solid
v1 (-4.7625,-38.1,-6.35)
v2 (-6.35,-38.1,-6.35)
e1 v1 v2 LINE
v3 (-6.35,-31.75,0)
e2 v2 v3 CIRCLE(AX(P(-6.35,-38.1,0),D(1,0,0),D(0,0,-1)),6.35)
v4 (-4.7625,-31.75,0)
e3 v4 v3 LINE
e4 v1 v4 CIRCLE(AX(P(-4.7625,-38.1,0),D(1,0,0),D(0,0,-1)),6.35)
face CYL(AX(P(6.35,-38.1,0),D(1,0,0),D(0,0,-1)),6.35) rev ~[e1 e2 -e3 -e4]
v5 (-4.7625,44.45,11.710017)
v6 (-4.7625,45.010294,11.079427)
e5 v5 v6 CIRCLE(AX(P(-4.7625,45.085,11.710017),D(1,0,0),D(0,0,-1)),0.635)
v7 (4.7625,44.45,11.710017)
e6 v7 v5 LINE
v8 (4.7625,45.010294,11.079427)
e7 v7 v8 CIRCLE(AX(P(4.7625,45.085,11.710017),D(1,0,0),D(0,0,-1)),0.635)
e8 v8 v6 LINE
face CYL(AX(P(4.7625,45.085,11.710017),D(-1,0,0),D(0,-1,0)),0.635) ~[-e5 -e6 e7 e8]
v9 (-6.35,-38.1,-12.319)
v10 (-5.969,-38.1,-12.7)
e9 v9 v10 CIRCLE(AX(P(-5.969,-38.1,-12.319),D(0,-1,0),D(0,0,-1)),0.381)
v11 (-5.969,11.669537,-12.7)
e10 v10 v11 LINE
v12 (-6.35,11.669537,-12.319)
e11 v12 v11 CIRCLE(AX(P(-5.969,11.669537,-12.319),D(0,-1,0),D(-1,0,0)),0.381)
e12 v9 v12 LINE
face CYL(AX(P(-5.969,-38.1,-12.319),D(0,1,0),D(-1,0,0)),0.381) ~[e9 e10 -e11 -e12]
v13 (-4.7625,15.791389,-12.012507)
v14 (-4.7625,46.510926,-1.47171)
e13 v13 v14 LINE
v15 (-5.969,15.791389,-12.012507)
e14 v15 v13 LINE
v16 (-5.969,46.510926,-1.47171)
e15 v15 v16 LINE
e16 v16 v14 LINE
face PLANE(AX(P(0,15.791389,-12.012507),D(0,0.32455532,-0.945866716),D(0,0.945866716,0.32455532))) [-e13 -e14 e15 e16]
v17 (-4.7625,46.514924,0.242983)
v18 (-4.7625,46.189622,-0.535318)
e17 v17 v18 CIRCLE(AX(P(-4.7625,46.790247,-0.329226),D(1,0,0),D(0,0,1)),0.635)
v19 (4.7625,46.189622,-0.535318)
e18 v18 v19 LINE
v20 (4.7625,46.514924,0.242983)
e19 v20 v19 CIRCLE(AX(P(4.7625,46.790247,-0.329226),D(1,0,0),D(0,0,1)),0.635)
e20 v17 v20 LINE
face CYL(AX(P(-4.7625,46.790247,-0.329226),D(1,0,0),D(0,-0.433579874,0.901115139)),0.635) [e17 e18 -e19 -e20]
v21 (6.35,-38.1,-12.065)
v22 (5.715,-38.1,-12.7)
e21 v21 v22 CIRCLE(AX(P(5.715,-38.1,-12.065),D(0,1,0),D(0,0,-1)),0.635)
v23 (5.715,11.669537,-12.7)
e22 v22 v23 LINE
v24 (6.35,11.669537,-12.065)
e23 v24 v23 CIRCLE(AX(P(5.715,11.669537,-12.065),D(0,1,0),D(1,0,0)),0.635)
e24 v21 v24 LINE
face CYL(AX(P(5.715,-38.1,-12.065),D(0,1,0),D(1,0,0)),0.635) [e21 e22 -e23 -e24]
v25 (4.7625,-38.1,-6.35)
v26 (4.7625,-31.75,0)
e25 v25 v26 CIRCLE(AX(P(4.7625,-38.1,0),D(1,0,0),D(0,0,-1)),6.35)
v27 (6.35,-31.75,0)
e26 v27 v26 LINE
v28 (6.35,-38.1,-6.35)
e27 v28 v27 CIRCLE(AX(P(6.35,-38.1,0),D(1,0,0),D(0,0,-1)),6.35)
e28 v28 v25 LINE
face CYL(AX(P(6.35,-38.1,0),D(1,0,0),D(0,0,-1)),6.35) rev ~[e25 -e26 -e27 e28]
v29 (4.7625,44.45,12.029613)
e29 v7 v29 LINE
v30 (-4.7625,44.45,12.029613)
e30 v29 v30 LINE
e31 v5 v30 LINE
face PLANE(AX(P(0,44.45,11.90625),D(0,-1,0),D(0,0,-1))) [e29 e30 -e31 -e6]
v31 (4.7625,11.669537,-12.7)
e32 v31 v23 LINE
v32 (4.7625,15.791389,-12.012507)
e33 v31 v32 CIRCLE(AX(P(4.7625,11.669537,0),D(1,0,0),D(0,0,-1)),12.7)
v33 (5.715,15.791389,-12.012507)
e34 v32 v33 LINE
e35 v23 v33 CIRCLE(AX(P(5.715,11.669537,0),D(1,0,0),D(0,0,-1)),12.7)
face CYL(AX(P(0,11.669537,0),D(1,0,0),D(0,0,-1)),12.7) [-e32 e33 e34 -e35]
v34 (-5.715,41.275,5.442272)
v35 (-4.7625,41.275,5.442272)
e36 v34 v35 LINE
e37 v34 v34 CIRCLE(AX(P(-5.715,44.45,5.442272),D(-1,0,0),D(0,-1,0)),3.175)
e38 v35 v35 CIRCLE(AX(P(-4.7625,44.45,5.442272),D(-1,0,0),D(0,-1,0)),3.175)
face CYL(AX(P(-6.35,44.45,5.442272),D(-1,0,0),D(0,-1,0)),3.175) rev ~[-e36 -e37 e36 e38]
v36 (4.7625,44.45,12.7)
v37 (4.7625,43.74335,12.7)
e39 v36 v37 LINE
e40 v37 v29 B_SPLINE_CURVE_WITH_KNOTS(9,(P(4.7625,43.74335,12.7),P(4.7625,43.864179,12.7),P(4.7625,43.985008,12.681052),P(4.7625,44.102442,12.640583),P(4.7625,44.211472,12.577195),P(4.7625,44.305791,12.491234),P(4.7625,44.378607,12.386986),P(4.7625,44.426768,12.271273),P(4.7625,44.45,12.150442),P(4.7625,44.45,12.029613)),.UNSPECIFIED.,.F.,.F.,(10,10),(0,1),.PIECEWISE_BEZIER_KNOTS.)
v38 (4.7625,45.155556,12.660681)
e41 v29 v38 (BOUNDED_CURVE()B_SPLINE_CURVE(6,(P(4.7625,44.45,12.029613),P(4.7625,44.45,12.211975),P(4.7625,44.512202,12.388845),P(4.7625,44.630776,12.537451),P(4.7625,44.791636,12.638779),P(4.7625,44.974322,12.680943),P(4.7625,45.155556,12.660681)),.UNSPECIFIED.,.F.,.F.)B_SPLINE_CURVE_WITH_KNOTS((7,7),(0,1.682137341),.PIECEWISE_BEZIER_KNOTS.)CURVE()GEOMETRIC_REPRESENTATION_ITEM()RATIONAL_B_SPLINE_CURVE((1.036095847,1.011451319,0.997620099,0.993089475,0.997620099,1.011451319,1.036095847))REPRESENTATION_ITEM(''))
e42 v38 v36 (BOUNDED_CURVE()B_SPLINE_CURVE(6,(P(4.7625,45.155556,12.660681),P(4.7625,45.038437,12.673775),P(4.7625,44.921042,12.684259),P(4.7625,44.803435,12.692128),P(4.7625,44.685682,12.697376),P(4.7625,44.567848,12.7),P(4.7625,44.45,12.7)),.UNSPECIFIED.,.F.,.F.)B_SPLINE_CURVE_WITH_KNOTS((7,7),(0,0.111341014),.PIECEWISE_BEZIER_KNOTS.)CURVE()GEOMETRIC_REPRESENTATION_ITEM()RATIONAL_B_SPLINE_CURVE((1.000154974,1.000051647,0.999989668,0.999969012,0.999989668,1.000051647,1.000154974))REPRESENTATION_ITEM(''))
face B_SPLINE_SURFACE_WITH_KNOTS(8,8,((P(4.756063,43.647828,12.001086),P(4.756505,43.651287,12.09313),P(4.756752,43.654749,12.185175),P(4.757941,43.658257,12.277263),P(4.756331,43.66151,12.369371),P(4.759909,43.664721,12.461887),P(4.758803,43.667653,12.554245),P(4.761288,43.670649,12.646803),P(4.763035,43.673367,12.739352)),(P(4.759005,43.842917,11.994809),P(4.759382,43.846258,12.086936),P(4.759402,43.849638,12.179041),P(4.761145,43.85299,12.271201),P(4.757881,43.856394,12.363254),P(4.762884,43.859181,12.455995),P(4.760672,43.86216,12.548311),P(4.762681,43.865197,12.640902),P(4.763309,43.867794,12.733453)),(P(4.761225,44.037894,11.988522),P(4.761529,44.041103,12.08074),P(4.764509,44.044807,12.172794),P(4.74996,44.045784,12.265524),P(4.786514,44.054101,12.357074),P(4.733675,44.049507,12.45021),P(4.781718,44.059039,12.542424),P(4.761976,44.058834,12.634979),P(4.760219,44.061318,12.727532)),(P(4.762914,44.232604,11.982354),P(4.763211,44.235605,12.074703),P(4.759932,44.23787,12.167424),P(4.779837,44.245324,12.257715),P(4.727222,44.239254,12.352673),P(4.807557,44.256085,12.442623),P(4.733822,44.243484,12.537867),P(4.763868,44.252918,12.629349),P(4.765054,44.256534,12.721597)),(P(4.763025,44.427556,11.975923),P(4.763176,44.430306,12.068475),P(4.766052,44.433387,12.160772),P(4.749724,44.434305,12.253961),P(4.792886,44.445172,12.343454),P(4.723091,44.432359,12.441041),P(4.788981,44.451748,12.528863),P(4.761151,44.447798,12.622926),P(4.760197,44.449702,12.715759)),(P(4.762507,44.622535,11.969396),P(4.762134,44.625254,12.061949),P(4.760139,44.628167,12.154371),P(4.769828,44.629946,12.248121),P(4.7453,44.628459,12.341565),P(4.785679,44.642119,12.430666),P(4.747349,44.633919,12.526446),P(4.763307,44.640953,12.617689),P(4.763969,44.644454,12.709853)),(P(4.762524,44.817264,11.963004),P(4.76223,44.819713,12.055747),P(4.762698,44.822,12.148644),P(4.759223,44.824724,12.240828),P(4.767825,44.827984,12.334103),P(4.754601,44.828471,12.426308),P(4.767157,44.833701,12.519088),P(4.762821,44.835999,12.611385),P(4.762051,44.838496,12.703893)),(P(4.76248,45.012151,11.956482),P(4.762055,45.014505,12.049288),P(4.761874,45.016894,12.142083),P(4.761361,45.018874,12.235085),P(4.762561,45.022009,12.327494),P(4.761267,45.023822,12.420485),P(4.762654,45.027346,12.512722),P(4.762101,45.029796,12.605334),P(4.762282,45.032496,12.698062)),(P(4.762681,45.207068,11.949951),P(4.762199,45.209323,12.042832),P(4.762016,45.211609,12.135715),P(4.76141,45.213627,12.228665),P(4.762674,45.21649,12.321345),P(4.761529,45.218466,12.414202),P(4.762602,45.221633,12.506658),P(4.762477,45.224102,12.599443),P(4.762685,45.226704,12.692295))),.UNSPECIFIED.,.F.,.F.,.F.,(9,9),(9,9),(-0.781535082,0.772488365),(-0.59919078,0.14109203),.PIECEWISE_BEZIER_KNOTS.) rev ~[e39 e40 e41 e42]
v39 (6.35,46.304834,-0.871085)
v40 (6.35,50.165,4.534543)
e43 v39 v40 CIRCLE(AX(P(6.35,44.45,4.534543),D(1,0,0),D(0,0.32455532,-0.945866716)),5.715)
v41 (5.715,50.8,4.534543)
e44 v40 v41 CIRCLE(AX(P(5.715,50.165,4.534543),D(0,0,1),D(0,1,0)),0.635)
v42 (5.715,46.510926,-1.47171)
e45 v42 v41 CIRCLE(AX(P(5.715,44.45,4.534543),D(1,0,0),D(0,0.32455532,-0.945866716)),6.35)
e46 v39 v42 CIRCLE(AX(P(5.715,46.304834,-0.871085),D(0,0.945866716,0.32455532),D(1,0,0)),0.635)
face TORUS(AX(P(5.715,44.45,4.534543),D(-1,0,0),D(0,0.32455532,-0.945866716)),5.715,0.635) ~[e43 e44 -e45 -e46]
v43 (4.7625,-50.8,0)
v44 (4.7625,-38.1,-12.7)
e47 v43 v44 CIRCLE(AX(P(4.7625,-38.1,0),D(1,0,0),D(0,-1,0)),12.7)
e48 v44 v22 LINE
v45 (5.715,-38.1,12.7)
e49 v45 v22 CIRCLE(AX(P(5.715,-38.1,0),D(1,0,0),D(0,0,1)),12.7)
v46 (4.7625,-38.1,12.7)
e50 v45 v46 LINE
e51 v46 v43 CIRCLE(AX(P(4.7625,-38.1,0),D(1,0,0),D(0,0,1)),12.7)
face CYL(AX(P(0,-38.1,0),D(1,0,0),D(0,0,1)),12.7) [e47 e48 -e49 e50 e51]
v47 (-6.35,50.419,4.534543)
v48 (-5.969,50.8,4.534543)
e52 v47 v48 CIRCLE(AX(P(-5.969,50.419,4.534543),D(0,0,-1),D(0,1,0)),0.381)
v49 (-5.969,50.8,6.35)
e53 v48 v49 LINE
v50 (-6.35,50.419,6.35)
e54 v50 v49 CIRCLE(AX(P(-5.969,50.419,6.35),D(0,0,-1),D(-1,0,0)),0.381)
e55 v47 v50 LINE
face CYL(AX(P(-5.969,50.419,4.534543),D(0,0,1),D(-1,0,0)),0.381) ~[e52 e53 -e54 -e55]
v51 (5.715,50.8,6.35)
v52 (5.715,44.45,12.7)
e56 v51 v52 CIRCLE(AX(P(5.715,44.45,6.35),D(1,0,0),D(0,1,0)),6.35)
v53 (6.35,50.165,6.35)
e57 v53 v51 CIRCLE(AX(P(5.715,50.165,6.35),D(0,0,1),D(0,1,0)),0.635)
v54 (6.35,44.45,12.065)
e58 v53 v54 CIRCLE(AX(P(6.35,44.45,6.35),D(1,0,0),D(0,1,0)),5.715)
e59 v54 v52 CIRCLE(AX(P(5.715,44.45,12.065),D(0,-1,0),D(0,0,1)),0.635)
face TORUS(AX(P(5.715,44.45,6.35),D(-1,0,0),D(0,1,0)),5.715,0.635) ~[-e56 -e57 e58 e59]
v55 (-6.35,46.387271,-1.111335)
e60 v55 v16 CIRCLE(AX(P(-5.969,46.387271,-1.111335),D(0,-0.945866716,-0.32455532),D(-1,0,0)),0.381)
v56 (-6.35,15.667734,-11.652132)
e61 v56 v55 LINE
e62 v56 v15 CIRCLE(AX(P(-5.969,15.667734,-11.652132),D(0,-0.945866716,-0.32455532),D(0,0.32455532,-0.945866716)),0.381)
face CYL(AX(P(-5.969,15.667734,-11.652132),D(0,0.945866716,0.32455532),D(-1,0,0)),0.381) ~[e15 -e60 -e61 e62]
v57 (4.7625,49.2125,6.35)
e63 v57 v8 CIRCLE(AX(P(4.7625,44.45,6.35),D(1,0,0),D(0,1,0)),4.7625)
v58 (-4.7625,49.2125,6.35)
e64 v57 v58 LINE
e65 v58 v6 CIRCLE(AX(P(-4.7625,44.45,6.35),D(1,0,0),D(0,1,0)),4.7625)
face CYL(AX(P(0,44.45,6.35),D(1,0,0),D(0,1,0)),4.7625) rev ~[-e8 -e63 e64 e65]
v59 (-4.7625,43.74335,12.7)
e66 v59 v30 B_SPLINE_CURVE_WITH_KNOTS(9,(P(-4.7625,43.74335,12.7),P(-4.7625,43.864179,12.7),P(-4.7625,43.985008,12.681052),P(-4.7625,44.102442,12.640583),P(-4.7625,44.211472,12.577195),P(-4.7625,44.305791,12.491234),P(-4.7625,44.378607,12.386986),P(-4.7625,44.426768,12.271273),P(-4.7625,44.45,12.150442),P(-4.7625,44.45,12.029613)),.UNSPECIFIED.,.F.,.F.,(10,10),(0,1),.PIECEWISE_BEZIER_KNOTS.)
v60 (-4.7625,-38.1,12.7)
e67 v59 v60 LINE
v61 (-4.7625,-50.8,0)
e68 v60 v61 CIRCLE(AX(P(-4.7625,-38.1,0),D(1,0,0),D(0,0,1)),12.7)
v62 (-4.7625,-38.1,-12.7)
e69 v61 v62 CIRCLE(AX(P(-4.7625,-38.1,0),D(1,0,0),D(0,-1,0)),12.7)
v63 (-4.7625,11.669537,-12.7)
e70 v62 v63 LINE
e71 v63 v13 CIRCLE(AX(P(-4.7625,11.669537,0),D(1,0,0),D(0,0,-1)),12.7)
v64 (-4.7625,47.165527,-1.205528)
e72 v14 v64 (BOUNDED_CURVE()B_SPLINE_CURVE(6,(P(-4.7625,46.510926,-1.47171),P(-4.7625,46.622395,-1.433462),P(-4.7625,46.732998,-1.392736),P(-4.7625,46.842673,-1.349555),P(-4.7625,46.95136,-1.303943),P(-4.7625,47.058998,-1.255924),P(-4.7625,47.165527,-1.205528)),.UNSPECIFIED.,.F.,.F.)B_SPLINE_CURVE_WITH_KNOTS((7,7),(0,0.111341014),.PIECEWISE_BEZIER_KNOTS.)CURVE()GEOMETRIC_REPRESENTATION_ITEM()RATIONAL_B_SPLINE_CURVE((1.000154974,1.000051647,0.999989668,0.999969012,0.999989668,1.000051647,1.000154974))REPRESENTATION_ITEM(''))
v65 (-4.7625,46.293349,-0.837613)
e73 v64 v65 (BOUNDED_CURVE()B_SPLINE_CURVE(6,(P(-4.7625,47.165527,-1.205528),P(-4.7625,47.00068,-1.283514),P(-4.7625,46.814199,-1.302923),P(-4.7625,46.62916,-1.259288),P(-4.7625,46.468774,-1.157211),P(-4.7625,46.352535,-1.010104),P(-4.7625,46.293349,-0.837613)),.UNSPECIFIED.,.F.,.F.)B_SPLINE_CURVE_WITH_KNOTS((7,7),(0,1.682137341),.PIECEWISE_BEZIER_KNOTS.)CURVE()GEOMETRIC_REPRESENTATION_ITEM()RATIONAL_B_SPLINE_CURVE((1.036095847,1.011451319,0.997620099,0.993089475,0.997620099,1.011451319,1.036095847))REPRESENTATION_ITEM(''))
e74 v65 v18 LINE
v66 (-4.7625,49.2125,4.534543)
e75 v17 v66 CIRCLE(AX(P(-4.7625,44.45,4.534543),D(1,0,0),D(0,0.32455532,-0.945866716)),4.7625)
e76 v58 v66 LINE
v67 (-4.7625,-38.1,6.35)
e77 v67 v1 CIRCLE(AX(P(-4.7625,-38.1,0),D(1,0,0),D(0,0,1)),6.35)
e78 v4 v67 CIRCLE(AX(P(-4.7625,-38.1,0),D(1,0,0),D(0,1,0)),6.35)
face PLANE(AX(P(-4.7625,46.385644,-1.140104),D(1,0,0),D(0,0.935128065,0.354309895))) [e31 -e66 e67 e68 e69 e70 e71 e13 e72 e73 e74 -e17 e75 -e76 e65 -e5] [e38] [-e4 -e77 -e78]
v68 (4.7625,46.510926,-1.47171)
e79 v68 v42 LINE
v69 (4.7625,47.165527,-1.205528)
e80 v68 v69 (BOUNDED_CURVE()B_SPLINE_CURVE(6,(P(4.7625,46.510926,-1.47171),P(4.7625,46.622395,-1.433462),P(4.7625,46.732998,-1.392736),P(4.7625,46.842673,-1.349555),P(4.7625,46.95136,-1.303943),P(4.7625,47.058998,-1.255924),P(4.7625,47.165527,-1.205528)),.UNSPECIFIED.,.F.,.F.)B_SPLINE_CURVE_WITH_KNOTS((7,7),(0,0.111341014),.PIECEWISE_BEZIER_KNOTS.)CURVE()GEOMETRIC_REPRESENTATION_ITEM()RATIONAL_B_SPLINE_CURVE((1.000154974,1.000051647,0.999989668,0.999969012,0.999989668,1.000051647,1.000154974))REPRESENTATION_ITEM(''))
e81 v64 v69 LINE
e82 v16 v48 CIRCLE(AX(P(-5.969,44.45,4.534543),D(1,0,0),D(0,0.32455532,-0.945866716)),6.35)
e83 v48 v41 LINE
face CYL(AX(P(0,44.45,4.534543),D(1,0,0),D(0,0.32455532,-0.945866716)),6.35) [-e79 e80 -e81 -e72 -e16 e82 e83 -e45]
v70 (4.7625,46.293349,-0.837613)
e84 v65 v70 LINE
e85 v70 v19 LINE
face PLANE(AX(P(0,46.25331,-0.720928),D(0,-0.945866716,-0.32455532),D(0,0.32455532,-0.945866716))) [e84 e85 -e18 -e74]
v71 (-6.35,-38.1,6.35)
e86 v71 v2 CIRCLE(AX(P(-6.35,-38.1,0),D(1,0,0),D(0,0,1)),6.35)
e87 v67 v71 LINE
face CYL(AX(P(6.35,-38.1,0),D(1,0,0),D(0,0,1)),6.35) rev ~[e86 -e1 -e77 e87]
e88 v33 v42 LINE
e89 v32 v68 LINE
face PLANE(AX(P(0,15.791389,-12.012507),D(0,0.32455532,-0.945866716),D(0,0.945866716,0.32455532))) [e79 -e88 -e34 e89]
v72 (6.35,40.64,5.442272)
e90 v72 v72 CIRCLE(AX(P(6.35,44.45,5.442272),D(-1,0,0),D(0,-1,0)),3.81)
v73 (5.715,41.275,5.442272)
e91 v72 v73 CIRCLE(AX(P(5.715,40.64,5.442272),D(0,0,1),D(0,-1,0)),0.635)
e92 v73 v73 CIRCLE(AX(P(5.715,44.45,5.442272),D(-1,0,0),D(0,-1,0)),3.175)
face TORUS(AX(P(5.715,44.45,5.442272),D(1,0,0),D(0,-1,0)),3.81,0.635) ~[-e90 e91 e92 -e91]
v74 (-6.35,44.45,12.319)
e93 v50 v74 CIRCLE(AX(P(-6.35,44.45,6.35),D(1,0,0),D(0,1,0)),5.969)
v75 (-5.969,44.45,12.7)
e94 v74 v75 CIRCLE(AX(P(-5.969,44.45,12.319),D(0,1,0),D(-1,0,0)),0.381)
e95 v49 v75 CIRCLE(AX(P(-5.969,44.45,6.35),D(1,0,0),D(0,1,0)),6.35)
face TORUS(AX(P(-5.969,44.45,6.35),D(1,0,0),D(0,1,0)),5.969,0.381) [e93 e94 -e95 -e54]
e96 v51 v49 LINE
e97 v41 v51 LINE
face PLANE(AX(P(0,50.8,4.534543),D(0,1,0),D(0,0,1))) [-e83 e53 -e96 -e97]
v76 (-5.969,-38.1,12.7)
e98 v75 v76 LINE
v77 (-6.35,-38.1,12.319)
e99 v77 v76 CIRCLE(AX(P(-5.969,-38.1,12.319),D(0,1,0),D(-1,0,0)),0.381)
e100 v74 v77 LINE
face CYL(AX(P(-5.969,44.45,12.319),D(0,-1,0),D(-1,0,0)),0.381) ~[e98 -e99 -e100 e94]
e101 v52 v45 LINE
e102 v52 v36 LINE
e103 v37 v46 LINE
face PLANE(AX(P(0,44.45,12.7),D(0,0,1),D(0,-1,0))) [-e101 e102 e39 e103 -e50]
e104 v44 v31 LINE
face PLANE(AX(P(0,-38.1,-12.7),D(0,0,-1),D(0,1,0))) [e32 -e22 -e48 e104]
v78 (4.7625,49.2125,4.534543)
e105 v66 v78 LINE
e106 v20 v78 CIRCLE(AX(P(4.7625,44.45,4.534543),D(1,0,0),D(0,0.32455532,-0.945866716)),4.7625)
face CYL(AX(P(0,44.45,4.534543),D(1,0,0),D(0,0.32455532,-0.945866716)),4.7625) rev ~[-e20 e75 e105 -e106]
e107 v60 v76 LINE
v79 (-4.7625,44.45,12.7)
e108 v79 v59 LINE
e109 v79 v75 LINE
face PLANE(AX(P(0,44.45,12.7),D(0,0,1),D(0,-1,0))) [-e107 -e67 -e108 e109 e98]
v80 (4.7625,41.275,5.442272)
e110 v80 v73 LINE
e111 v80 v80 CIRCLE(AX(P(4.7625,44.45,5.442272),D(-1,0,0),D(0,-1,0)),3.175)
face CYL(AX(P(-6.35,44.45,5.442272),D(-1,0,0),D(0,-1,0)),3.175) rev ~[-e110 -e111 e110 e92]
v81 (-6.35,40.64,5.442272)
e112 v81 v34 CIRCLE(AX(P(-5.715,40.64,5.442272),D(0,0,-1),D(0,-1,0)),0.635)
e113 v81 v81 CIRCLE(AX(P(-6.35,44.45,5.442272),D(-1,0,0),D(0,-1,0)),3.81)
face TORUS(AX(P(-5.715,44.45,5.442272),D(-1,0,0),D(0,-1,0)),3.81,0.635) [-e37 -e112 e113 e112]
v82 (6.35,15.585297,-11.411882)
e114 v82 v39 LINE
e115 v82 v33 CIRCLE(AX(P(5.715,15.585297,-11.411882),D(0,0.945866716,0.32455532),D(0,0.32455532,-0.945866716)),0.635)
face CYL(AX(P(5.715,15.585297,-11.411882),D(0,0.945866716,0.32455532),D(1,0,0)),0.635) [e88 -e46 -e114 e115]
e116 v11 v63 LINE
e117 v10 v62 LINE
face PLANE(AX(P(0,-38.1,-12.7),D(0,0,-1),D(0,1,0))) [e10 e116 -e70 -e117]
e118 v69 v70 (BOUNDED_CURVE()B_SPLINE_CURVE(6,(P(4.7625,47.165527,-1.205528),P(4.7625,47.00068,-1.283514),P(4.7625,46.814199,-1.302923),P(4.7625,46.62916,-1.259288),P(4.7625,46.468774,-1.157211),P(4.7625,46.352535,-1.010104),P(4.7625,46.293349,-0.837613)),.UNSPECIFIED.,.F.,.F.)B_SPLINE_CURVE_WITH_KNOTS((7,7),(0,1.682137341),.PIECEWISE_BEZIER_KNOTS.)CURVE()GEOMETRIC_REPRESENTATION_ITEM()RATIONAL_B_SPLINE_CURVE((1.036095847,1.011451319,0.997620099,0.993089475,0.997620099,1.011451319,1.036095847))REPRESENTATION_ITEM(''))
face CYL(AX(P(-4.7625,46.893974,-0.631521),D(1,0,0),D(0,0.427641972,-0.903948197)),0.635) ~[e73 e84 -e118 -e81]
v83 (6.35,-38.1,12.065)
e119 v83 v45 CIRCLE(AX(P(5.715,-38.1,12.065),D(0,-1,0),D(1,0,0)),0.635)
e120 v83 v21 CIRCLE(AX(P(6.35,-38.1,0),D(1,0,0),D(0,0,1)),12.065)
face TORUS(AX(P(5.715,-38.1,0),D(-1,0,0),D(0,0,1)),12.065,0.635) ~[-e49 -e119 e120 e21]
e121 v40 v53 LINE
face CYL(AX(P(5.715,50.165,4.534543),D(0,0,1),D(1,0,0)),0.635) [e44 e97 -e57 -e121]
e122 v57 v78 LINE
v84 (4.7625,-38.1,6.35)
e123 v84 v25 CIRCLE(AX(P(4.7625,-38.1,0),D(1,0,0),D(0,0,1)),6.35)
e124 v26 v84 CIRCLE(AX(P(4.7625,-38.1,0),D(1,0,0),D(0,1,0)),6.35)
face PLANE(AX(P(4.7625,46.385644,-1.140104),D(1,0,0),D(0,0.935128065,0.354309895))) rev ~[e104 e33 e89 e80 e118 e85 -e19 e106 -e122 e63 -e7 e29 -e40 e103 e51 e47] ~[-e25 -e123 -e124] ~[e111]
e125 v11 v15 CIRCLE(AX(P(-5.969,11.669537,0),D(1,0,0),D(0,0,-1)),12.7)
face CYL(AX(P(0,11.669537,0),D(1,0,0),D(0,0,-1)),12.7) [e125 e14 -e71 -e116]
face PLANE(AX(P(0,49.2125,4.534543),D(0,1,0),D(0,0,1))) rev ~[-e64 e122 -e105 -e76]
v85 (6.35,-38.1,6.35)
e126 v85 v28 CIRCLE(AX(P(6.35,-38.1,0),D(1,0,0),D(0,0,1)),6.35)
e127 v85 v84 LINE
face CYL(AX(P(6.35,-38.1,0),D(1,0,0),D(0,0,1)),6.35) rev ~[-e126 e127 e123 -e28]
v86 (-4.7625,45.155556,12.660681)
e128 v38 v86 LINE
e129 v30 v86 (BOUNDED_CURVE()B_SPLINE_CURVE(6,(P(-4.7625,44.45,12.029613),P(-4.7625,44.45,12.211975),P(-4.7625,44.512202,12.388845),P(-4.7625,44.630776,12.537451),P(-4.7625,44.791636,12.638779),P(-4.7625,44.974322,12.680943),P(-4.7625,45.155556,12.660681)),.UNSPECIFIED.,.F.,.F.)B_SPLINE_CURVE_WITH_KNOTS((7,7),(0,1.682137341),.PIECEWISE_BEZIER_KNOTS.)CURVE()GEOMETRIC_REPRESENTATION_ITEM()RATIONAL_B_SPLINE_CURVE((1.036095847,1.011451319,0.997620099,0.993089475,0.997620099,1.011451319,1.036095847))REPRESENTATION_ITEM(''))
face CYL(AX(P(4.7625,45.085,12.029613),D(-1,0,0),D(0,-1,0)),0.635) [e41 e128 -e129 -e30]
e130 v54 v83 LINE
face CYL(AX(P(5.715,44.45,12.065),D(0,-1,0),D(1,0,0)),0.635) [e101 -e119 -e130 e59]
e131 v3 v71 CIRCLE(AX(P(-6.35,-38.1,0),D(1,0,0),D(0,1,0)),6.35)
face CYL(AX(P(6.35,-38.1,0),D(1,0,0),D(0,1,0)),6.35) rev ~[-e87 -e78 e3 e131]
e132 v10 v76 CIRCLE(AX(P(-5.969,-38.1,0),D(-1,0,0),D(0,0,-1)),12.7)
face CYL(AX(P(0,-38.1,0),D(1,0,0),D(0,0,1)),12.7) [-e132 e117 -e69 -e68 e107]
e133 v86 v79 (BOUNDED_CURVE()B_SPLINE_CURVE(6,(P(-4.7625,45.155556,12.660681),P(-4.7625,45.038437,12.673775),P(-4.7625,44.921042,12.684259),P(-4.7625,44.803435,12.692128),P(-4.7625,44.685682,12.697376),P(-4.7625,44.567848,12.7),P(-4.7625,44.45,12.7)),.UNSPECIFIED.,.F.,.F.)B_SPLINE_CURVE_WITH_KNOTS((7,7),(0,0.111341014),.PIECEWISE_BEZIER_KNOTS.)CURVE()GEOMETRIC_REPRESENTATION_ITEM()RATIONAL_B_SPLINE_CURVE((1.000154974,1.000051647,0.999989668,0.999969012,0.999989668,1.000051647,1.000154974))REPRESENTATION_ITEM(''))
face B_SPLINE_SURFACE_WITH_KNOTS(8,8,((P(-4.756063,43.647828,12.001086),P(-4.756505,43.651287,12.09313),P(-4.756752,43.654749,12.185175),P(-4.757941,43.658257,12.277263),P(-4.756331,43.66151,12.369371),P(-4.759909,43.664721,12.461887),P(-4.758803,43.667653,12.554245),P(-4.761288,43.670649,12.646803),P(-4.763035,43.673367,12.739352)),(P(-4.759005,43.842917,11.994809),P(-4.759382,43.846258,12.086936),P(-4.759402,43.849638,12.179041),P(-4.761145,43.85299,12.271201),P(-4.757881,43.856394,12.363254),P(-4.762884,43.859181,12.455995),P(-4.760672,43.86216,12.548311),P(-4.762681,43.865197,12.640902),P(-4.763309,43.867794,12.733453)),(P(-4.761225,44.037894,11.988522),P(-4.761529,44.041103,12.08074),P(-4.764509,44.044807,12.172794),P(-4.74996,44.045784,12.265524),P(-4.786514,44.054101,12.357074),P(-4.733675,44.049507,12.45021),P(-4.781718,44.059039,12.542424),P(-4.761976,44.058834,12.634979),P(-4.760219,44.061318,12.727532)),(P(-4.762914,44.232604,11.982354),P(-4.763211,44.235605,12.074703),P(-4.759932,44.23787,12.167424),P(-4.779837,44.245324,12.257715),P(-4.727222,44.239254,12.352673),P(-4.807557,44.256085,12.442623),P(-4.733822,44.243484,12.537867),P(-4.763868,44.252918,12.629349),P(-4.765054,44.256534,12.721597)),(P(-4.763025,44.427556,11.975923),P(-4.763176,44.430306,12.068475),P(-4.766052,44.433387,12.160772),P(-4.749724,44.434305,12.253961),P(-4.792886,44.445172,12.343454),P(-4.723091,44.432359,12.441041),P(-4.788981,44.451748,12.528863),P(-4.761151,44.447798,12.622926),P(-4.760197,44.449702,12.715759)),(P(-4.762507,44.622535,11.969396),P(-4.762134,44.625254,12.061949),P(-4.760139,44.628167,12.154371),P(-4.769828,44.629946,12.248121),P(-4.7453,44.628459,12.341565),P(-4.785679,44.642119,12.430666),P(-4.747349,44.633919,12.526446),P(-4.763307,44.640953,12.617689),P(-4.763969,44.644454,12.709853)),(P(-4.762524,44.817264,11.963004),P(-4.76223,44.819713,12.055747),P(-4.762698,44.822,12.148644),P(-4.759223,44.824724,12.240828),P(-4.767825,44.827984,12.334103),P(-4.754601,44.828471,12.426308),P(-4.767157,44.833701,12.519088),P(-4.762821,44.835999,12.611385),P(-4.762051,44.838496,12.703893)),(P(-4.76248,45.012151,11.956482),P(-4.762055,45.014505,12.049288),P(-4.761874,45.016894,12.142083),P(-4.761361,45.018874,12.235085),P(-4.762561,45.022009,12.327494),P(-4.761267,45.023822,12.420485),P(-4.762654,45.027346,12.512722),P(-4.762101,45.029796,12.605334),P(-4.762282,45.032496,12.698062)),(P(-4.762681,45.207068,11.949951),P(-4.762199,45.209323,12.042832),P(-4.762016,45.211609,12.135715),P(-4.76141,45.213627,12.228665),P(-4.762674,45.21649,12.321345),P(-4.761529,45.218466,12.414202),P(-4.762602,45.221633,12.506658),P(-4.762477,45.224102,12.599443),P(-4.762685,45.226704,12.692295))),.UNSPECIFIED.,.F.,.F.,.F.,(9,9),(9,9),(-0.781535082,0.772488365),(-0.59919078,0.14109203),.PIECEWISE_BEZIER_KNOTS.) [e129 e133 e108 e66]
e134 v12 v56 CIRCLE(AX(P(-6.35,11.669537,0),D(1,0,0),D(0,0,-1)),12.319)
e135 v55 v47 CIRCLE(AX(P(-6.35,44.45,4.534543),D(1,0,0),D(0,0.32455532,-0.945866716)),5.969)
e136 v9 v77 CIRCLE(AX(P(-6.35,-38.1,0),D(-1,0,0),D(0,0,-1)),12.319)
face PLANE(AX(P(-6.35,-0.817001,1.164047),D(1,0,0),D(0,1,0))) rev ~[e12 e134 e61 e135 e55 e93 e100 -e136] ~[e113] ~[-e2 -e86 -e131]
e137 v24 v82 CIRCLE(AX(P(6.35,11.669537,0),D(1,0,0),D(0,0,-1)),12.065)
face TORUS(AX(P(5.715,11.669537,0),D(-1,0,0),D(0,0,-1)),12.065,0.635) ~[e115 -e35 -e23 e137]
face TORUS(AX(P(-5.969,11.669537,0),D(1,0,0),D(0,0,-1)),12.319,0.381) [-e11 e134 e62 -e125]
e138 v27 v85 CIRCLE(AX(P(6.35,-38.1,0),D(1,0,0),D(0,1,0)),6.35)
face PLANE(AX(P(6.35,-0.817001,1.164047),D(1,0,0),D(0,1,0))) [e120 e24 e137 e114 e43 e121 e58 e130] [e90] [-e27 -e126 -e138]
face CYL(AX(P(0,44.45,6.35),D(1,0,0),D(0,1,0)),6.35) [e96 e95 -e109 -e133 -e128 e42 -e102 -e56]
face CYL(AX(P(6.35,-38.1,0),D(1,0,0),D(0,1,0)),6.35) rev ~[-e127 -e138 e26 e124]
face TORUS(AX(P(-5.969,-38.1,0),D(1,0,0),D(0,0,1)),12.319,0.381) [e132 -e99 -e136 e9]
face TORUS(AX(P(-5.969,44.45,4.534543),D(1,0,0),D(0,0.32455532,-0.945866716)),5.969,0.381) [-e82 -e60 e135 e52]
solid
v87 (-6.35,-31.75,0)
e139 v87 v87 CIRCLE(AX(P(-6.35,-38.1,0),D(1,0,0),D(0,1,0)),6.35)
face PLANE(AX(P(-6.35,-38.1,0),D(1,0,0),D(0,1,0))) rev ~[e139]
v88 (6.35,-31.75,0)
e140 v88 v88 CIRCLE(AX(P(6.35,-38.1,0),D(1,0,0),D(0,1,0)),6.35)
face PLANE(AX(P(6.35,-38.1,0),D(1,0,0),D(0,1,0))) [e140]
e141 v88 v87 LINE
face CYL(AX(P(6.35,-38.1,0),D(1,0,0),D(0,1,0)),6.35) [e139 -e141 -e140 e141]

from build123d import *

# Parameters (mm, degrees)
F1_DEPTH  = 6.35
F2_T      = 1.5875
F3_R      = 3.175
F4_DEPTH  = 25.4
F5_R      = 0.635
F6_R      = 0.381
F7_F1_R   = 0.635
F7_F2_R   = 0.635
F7_F3_R   = 0.635
F7_F4_R   = 0.635
F7_F5_R   = 0.635
F9_DEPTH  = 25.4
F10_R     = 6.35
F11_DEPTH = 12.7


# Not quite as in the source:
# - a shell that OpenCascade refuses in one call is made with other operations: the cavity is built on its own and cut out


with BuildPart() as f1:
    # F0 (on Right) → F1 (new body, symmetric)
    with BuildSketch(Plane.YZ):
        with BuildLine():
            ThreePointArc((-38.1, 12.7), (-47.0802561211, 8.9802561211), (-50.8, 0))
            ThreePointArc((-50.8, 0), (-47.0802561211, -8.9802561211), (-38.1, -12.7))
            Line((-38.1, -12.7), (11.6695368579, -12.7))
            ThreePointArc((11.6695368579, -12.7), (13.7589335903, -12.5269478044), (15.7913894262, -12.0125072905))
            Line((15.7913894262, -12.0125072905), (46.5109262841, -1.4717102003))
            ThreePointArc((46.5109262841, -1.4717102003), (49.617658169, 0.8443118739), (50.8, 4.5345434449))
            Line((50.8, 4.5345434449), (50.8, 6.35))
            ThreePointArc((50.8, 6.35), (48.9401280605, 10.8401280605), (44.45, 12.7))
            Line((44.45, 12.7), (-38.1, 12.7))
        make_face()
    extrude(amount=F1_DEPTH, both=True)

    # F2: shell of thickness 1.5875, made by hand


with BuildPart() as f2_core1:
    # F2_t2: copy of F1
    add(f1.part)

    # the walls: a layer under each face that stays
    f2_faces = [f2_core1.faces().sort_by_distance(p)[0] for p in [
        (0, 48.9401280605, 10.8401280605),
        (0, 50.8, 5.4422717225),
        (0, 49.617658169, 0.8443118739),
        (6.35, 0, 0),
        (-6.35, 0, 0),
    ]]
    thicken(f2_faces, amount=-F2_T, mode=Mode.SUBTRACT)


with BuildPart() as f1_1:
    add(f1.part)

    # what is left inside the walls is the cavity
    f2_cavity = [f2_core1.part.solids().sort_by_distance(p)[0] for p in [
        (4.746625, -0.79375, -4.233333),
    ]]
    add(f2_cavity, mode=Mode.SUBTRACT)

    # F3 (on face) → F4 (cut)
    with BuildSketch(Plane(origin=(-6.35, 0, 0), x_dir=(0, -1, 0), z_dir=(-1, 0, 0))):
        with Locations((-44.45, 5.4422717225)):
            Circle(F3_R)
    extrude(amount=-F4_DEPTH, mode=Mode.SUBTRACT)

    # F5
    f5_edges = [f1_1.edges().sort_by_distance(p)[0] for p in [
        (-6.35, 47.625, 5.442272),
        (6.35, 47.625, 5.442272),
    ]]
    fillet(f5_edges, radius=F5_R)

    # F6
    f6_edges = [f1_1.edges().sort_by_distance(p)[0] for p in [
        (-6.35, 48.26, 5.442272),
        (-6.35, 3.175, 12.7),
        (-6.35, 48.940128, 10.840128),
        (-6.35, -50.8, 0),
        (-6.35, 50.8, 5.442272),
        (-6.35, -13.215232, -12.7),
        (-6.35, 49.617658, 0.844312),
        (-6.35, 13.758934, -12.526948),
        (-6.35, 31.151158, -6.742109),
    ]]
    fillet(f6_edges, radius=F6_R)

    # F7: fillet of radius 0.635 on 13 edges, made by hand

    # F7_f1
    f7_f1_edges = [f1_1.edges().sort_by_distance(p)[0] for p in [
        (6.35, 48.9401280605, 10.8401280605),
        (6.35, 50.8, 5.4422717225),
        (6.35, 49.617658169, 0.8443118739),
        (6.35, 3.175, 12.7),
        (6.35, -50.8, 0),
        (6.35, -13.215231571, -12.7),
        (6.35, 13.7589335903, -12.5269478044),
        (6.35, 31.1511578552, -6.7421087454),
    ]]
    fillet(f7_f1_edges, radius=F7_F1_R)

    # F7_f2
    f7_f2_edges = [f1_1.edges().sort_by_distance(p)[0] for p in [
        (0, 46.5109262841, -1.4717102003),
    ]]
    fillet(f7_f2_edges, radius=F7_F2_R)

    # F7_f3
    f7_f3_edges = [f1_1.edges().sort_by_distance(p)[0] for p in [
        (0, 44.45, 11.1125),
    ]]
    fillet(f7_f3_edges, radius=F7_F3_R)

    # F7_f4
    f7_f4_edges = [f1_1.edges().sort_by_distance(p)[0] for p in [
        (0, 45.9956947131, 0.029853211),
    ]]
    fillet(f7_f4_edges, radius=F7_F4_R)

    # F7_f5
    f7_f5_edges = [f1_1.edges().sort_by_distance(p)[0] for p in [
        (0, 44.45, 12.7),
    ]]
    fillet(f7_f5_edges, radius=F7_F5_R)

    # F8 (on face) → F9 (cut)
    with BuildSketch(Plane.YZ.offset(6.35)):
        with BuildLine():
            ThreePointArc((-31.75, 0), (-33.6098719395, 4.4901280605), (-38.1, 6.35))
            Line((-38.1, 6.35), (-38.1, -6.35))
            ThreePointArc((-38.1, -6.35), (-33.6098719395, -4.4901280605), (-31.75, 0))
        make_face()
        with BuildLine():
            Line((-38.1, -6.35), (-38.1, 6.35))
            ThreePointArc((-38.1, 6.35), (-44.45, 0), (-38.1, -6.35))
        make_face()
    extrude(amount=-F9_DEPTH, mode=Mode.SUBTRACT)


with BuildPart() as f11:
    # F10 (on face) → F11 (new body)
    with BuildSketch(Plane.YZ.offset(6.35)):
        with Locations((-38.1, 0)):
            Circle(F10_R)
    extrude(amount=-F11_DEPTH)


solid = Compound([f1_1.part, f11.part])
